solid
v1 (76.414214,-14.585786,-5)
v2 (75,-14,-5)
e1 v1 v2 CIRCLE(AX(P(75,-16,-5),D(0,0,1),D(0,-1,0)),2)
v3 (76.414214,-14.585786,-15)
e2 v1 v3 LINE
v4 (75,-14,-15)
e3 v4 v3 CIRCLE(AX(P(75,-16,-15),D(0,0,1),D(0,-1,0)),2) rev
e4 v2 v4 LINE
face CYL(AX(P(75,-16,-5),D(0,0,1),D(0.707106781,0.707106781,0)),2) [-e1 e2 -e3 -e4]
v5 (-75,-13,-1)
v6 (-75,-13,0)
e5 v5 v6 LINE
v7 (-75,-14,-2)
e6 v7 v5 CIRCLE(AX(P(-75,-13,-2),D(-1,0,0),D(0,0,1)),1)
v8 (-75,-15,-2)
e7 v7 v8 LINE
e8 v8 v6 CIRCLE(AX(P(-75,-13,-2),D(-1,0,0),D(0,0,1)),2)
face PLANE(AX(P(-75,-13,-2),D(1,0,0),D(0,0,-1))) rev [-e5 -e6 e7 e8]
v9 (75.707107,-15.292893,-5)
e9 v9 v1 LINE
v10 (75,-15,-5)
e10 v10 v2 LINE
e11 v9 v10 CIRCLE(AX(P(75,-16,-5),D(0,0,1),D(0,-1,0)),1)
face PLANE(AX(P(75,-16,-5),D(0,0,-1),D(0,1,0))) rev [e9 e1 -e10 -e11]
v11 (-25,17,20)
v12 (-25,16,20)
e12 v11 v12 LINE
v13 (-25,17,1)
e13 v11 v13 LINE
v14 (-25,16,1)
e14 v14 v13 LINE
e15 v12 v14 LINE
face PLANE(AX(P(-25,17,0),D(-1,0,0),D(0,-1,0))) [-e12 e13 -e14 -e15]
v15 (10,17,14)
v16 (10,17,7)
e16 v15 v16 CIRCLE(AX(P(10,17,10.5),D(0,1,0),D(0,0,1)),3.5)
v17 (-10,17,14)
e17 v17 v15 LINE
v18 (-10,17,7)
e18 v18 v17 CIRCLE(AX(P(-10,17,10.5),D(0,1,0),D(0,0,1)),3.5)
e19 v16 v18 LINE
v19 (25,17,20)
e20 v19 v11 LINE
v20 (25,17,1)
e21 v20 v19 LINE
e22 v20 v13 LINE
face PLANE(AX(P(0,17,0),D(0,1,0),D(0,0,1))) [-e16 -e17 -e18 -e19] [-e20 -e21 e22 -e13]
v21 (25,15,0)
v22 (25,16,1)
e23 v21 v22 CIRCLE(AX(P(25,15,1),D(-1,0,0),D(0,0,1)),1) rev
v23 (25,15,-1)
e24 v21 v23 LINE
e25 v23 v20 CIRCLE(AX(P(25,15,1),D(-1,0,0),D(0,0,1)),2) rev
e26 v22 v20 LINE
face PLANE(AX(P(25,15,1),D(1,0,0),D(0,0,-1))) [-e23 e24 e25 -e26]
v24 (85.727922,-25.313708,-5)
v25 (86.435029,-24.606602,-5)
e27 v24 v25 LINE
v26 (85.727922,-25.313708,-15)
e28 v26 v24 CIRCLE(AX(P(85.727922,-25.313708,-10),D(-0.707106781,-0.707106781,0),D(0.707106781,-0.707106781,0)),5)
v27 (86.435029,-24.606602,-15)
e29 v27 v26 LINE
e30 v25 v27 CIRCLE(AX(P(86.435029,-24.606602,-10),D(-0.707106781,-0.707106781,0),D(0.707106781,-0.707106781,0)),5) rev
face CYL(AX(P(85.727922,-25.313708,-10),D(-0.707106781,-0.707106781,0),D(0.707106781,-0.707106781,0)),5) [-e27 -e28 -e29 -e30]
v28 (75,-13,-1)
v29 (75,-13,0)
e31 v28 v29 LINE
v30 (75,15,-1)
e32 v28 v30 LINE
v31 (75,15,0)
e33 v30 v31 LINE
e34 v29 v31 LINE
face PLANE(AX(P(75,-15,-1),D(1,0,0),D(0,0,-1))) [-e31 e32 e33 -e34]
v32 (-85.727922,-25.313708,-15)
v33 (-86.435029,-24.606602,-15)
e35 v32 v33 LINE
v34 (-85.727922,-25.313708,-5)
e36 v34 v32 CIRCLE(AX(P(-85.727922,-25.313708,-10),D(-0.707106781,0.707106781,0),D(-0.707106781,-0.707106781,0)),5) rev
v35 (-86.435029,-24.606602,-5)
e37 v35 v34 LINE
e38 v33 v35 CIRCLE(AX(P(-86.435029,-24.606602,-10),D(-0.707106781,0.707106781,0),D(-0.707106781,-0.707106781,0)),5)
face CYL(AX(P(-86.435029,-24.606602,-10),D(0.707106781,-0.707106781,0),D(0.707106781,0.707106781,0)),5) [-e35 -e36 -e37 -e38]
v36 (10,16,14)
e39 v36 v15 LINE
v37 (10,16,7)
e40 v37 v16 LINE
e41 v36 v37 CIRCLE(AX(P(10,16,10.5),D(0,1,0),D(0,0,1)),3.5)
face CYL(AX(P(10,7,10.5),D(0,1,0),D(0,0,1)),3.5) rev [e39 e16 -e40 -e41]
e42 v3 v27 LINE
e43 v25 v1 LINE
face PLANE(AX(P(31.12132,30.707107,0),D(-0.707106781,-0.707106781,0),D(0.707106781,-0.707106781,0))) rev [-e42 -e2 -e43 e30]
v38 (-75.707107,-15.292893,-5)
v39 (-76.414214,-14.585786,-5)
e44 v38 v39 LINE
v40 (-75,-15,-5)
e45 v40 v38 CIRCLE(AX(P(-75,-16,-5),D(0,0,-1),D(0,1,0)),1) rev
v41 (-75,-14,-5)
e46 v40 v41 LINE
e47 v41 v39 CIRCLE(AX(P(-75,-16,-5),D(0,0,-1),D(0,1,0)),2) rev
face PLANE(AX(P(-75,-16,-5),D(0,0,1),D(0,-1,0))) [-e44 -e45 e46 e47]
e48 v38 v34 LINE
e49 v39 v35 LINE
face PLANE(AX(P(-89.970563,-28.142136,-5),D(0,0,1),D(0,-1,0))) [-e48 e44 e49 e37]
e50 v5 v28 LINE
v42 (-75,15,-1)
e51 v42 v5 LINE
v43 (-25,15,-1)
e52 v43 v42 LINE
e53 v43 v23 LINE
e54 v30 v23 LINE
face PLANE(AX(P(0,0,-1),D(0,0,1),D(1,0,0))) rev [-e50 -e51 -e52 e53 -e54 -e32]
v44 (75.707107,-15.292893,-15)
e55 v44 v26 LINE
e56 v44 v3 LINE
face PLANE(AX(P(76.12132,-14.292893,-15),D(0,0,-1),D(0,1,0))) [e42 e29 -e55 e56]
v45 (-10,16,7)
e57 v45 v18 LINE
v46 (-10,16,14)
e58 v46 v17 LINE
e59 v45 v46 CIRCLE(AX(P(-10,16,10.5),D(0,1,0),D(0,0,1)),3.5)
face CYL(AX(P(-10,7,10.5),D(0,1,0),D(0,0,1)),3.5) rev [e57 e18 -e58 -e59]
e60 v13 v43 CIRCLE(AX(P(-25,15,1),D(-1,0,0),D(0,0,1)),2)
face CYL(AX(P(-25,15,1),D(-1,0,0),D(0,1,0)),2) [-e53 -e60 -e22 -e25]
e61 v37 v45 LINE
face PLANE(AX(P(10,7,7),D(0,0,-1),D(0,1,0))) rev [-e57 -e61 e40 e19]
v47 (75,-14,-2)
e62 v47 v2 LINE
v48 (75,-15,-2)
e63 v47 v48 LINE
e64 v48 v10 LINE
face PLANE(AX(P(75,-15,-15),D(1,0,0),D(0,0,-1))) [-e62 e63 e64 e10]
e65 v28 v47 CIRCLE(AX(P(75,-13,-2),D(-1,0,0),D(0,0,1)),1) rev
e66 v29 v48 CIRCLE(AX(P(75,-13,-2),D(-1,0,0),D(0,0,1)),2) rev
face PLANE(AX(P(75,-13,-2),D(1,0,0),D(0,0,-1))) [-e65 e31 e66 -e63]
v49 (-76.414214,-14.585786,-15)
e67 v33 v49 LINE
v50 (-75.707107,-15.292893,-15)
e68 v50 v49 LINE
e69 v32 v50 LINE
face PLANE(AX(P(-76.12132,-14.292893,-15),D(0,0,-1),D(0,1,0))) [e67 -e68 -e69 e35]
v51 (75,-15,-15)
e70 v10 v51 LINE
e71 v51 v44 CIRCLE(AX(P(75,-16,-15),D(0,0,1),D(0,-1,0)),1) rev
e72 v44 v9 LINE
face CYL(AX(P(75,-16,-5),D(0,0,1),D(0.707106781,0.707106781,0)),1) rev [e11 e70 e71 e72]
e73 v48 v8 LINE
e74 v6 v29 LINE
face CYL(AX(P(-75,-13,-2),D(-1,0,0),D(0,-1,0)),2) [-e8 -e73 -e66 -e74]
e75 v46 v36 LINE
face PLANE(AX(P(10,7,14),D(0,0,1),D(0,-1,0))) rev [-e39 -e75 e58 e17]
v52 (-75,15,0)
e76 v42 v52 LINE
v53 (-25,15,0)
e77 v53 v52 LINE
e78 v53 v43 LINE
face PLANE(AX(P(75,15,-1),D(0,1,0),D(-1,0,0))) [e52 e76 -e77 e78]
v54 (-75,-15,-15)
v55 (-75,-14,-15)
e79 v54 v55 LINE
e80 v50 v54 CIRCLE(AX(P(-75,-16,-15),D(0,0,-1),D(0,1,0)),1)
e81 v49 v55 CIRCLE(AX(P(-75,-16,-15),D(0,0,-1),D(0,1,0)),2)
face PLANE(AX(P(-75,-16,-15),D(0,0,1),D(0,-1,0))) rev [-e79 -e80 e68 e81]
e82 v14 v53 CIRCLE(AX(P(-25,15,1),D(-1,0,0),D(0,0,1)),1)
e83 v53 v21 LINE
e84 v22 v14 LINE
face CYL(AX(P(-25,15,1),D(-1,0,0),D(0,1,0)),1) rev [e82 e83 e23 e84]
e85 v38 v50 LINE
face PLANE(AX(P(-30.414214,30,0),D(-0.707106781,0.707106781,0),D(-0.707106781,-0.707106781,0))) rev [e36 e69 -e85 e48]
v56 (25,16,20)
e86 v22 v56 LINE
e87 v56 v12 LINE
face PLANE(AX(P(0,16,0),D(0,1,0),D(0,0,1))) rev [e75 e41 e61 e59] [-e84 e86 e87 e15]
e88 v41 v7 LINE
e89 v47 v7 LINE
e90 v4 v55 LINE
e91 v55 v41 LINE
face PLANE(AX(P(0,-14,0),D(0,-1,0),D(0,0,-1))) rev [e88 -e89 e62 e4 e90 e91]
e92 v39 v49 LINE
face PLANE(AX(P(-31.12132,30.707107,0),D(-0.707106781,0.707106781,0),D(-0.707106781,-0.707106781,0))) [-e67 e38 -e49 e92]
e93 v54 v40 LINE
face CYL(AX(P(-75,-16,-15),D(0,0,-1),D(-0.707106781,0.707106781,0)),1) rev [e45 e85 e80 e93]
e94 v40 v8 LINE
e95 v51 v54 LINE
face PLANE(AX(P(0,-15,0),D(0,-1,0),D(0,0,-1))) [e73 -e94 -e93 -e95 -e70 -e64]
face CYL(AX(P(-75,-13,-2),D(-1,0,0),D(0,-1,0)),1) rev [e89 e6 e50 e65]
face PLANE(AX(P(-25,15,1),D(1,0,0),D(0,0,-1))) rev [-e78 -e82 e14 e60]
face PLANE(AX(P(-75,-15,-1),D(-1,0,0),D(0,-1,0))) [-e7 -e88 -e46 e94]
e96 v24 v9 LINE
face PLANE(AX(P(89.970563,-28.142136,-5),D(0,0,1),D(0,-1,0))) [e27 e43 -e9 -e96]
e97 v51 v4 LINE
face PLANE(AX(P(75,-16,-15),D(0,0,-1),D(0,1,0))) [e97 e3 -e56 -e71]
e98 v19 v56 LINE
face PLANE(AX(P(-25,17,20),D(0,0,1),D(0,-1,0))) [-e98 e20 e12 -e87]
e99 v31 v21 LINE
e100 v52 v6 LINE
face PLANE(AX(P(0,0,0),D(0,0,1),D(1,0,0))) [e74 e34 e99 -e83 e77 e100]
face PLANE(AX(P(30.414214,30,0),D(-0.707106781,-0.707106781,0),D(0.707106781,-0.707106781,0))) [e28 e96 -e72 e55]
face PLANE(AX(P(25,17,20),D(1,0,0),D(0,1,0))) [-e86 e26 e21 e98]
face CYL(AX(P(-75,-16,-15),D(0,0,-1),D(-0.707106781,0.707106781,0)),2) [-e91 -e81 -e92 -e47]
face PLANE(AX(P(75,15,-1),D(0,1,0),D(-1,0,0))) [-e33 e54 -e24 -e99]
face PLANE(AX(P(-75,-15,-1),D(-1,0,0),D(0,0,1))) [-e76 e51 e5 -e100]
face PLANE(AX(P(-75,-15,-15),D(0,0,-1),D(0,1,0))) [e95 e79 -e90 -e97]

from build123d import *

# Parameters (mm, degrees)
CROQUIS1_W                       = 150
CROQUIS1_H                       = 30
BRIDA_BASE1_DEPTH                = 1
BRIDA_DE_ARISTA1_DEPTH           = 50
BRIDA_DE_ARISTA2_STRIP_W         = 6
BRIDA_DE_ARISTA2_STRIP_H         = 1
BRIDA_DE_ARISTA2_STRIP_CUT_DEPTH = 150
BRIDA_DE_ARISTA2_DEPTH           = 150
BRIDA_DE_ARISTA3_DEPTH           = 10
BRIDA_DE_ARISTA3_BEND_DEPTH      = 10
REDONDEO1_RADIUS                 = 5
REDONDEO1_LENGTH                 = 1
REDONDEO2_RADIUS                 = 5
REDONDEO2_LENGTH                 = 1
CORTAR_EXTRUIR1_DEPTH            = 10


# Sheet-metal steps are written as plain solids
with BuildPart() as part:
    # Croquis1 → Brida base1 (new body)
    with BuildSketch(Plane.XY):
        Rectangle(CROQUIS1_W, CROQUIS1_H)
    extrude(amount=-BRIDA_BASE1_DEPTH)

    # Brida de arista1 section (across the edge) → Brida de arista1 (add)
    with BuildSketch(Plane(origin=(25, 16, 0), x_dir=(0, -1, 0), z_dir=(-1, 0, 0))):
        with BuildLine():
            Line((-1, 1), (-1, 20))
            Line((-1, 20), (0, 20))
            Line((0, 20), (0, 1))
            ThreePointArc((0, 1), (0.292893219, 0.292893219), (1, 0))
            Line((1, 0), (1, -1))
            ThreePointArc((1, -1), (-0.414213562, -0.414213562), (-1, 1))
        make_face()
    extrude(amount=BRIDA_DE_ARISTA1_DEPTH)

    # Brida de arista2 strip (across the edge) → Brida de arista2 strip cut (cut)
    with BuildSketch(Plane(origin=(75, -15, -1), x_dir=(0, 1, 0), z_dir=(-1, 0, 0))):
        with Locations((-1, -0.5)):
            Rectangle(BRIDA_DE_ARISTA2_STRIP_W, BRIDA_DE_ARISTA2_STRIP_H)
    extrude(amount=BRIDA_DE_ARISTA2_STRIP_CUT_DEPTH, mode=Mode.SUBTRACT)

    # Brida de arista2 section (across the edge) → Brida de arista2 (add)
    with BuildSketch(Plane(origin=(75, -15, -1), x_dir=(0, 1, 0), z_dir=(-1, 0, 0))):
        with BuildLine():
            Line((0, 1), (0, 14))
            Line((0, 14), (1, 14))
            Line((1, 14), (1, 1))
            ThreePointArc((1, 1), (1.292893219, 0.292893219), (2, 0))
            Line((2, 0), (2, -1))
            ThreePointArc((2, -1), (0.585786438, -0.414213562), (0, 1))
        make_face()
    extrude(amount=BRIDA_DE_ARISTA2_DEPTH)

    # Brida de arista3 section (across the edge) → Brida de arista3 (add)
    with BuildSketch(Plane(origin=(-75.414213562, -15, -5), x_dir=(0.7071067811865439, -0.7071067811865511, 1.6984173230954452e-15), z_dir=(0, 0, -1))):
        with BuildLine():
            Line((-1, 0.414213562), (-1, 19.585786438))
            Line((-1, 19.585786438), (0, 19.585786438))
            Line((0, 19.585786438), (0, 0.414213562))
            ThreePointArc((0, 0.414213562), (0.076120467, 0.03153013), (0.292893219, -0.292893219))
            Line((0.292893219, -0.292893219), (-0.414213562, -1))
            ThreePointArc((-0.414213562, -1), (-0.847759065, -0.351153302), (-1, 0.414213562))
        make_face()
    extrude(amount=BRIDA_DE_ARISTA3_DEPTH)

    # Brida de arista3 section 2 (across the edge) → Brida de arista3 bend (add)
    with BuildSketch(Plane(origin=(75.414213562, -15, -15), x_dir=(-0.7071067811865437, -0.7071067811865513, 3.0194085743918815e-15), z_dir=(0, 0, 1))):
        with BuildLine():
            Line((-1, 0.414213562), (-1, 19.585786438))
            Line((-1, 19.585786438), (0, 19.585786438))
            Line((0, 19.585786438), (0, 0.414213562))
            ThreePointArc((0, 0.414213562), (0.076120467, 0.03153013), (0.292893219, -0.292893219))
            Line((0.292893219, -0.292893219), (-0.414213562, -1))
            ThreePointArc((-0.414213562, -1), (-0.847759065, -0.351153302), (-1, 0.414213562))
        make_face()
    extrude(amount=BRIDA_DE_ARISTA3_BEND_DEPTH)

    # Redondeo1: full round fillet: the end face becomes a half cylinder, R = half its width
    redondeo1_face = Plane((-89.617009358, -28.495689014, -10), x_dir=(-0.707106781187, 0.707106781187, 0), z_dir=(-0.707106781187, -0.707106781187, 0))  # on the end face: x along it, z out of the body
    redondeo1_slab = redondeo1_face.offset(-REDONDEO1_RADIUS / 2) * Box(REDONDEO1_LENGTH, 2 * REDONDEO1_RADIUS, REDONDEO1_RADIUS, mode=Mode.PRIVATE)  # the body's end, R deep
    redondeo1_round = Plane((-86.081475452, -24.960155108, -10), x_dir=(-0.707106781187, -0.707106781187, 0), z_dir=(-0.707106781187, 0.707106781187, 0)) * Cylinder(REDONDEO1_RADIUS, REDONDEO1_LENGTH, mode=Mode.PRIVATE)  # its axis R under the face
    add(redondeo1_slab - redondeo1_round, mode=Mode.SUBTRACT)

    # Redondeo2: full round fillet: the end face becomes a half cylinder, R = half its width
    redondeo2_face = Plane((89.617009358, -28.495689014, -10), x_dir=(0.707106781187, 0.707106781187, 0), z_dir=(0.707106781187, -0.707106781187, 0))  # on the end face: x along it, z out of the body
    redondeo2_slab = redondeo2_face.offset(-REDONDEO2_RADIUS / 2) * Box(REDONDEO2_LENGTH, 2 * REDONDEO2_RADIUS, REDONDEO2_RADIUS, mode=Mode.PRIVATE)  # the body's end, R deep
    redondeo2_round = Plane((86.081475452, -24.960155108, -10), x_dir=(0.707106781187, -0.707106781187, 0), z_dir=(0.707106781187, 0.707106781187, 0)) * Cylinder(REDONDEO2_RADIUS, REDONDEO2_LENGTH, mode=Mode.PRIVATE)  # its axis R under the face
    add(redondeo2_slab - redondeo2_round, mode=Mode.SUBTRACT)

    # Croquis18 → Cortar-Extruir1 (cut)
    with BuildSketch(Plane(origin=(0, 17, 0), x_dir=(1, 0, 0), z_dir=(0, 1, 0))):
        with BuildLine():
            Line((10, -14), (-10, -14))
            ThreePointArc((-10, -14), (-13.5, -10.5), (-10, -7))
            Line((-10, -7), (10, -7))
            ThreePointArc((10, -7), (13.5, -10.5), (10, -14))
        make_face()
    extrude(amount=-CORTAR_EXTRUIR1_DEPTH, mode=Mode.SUBTRACT)


solid = part.part
